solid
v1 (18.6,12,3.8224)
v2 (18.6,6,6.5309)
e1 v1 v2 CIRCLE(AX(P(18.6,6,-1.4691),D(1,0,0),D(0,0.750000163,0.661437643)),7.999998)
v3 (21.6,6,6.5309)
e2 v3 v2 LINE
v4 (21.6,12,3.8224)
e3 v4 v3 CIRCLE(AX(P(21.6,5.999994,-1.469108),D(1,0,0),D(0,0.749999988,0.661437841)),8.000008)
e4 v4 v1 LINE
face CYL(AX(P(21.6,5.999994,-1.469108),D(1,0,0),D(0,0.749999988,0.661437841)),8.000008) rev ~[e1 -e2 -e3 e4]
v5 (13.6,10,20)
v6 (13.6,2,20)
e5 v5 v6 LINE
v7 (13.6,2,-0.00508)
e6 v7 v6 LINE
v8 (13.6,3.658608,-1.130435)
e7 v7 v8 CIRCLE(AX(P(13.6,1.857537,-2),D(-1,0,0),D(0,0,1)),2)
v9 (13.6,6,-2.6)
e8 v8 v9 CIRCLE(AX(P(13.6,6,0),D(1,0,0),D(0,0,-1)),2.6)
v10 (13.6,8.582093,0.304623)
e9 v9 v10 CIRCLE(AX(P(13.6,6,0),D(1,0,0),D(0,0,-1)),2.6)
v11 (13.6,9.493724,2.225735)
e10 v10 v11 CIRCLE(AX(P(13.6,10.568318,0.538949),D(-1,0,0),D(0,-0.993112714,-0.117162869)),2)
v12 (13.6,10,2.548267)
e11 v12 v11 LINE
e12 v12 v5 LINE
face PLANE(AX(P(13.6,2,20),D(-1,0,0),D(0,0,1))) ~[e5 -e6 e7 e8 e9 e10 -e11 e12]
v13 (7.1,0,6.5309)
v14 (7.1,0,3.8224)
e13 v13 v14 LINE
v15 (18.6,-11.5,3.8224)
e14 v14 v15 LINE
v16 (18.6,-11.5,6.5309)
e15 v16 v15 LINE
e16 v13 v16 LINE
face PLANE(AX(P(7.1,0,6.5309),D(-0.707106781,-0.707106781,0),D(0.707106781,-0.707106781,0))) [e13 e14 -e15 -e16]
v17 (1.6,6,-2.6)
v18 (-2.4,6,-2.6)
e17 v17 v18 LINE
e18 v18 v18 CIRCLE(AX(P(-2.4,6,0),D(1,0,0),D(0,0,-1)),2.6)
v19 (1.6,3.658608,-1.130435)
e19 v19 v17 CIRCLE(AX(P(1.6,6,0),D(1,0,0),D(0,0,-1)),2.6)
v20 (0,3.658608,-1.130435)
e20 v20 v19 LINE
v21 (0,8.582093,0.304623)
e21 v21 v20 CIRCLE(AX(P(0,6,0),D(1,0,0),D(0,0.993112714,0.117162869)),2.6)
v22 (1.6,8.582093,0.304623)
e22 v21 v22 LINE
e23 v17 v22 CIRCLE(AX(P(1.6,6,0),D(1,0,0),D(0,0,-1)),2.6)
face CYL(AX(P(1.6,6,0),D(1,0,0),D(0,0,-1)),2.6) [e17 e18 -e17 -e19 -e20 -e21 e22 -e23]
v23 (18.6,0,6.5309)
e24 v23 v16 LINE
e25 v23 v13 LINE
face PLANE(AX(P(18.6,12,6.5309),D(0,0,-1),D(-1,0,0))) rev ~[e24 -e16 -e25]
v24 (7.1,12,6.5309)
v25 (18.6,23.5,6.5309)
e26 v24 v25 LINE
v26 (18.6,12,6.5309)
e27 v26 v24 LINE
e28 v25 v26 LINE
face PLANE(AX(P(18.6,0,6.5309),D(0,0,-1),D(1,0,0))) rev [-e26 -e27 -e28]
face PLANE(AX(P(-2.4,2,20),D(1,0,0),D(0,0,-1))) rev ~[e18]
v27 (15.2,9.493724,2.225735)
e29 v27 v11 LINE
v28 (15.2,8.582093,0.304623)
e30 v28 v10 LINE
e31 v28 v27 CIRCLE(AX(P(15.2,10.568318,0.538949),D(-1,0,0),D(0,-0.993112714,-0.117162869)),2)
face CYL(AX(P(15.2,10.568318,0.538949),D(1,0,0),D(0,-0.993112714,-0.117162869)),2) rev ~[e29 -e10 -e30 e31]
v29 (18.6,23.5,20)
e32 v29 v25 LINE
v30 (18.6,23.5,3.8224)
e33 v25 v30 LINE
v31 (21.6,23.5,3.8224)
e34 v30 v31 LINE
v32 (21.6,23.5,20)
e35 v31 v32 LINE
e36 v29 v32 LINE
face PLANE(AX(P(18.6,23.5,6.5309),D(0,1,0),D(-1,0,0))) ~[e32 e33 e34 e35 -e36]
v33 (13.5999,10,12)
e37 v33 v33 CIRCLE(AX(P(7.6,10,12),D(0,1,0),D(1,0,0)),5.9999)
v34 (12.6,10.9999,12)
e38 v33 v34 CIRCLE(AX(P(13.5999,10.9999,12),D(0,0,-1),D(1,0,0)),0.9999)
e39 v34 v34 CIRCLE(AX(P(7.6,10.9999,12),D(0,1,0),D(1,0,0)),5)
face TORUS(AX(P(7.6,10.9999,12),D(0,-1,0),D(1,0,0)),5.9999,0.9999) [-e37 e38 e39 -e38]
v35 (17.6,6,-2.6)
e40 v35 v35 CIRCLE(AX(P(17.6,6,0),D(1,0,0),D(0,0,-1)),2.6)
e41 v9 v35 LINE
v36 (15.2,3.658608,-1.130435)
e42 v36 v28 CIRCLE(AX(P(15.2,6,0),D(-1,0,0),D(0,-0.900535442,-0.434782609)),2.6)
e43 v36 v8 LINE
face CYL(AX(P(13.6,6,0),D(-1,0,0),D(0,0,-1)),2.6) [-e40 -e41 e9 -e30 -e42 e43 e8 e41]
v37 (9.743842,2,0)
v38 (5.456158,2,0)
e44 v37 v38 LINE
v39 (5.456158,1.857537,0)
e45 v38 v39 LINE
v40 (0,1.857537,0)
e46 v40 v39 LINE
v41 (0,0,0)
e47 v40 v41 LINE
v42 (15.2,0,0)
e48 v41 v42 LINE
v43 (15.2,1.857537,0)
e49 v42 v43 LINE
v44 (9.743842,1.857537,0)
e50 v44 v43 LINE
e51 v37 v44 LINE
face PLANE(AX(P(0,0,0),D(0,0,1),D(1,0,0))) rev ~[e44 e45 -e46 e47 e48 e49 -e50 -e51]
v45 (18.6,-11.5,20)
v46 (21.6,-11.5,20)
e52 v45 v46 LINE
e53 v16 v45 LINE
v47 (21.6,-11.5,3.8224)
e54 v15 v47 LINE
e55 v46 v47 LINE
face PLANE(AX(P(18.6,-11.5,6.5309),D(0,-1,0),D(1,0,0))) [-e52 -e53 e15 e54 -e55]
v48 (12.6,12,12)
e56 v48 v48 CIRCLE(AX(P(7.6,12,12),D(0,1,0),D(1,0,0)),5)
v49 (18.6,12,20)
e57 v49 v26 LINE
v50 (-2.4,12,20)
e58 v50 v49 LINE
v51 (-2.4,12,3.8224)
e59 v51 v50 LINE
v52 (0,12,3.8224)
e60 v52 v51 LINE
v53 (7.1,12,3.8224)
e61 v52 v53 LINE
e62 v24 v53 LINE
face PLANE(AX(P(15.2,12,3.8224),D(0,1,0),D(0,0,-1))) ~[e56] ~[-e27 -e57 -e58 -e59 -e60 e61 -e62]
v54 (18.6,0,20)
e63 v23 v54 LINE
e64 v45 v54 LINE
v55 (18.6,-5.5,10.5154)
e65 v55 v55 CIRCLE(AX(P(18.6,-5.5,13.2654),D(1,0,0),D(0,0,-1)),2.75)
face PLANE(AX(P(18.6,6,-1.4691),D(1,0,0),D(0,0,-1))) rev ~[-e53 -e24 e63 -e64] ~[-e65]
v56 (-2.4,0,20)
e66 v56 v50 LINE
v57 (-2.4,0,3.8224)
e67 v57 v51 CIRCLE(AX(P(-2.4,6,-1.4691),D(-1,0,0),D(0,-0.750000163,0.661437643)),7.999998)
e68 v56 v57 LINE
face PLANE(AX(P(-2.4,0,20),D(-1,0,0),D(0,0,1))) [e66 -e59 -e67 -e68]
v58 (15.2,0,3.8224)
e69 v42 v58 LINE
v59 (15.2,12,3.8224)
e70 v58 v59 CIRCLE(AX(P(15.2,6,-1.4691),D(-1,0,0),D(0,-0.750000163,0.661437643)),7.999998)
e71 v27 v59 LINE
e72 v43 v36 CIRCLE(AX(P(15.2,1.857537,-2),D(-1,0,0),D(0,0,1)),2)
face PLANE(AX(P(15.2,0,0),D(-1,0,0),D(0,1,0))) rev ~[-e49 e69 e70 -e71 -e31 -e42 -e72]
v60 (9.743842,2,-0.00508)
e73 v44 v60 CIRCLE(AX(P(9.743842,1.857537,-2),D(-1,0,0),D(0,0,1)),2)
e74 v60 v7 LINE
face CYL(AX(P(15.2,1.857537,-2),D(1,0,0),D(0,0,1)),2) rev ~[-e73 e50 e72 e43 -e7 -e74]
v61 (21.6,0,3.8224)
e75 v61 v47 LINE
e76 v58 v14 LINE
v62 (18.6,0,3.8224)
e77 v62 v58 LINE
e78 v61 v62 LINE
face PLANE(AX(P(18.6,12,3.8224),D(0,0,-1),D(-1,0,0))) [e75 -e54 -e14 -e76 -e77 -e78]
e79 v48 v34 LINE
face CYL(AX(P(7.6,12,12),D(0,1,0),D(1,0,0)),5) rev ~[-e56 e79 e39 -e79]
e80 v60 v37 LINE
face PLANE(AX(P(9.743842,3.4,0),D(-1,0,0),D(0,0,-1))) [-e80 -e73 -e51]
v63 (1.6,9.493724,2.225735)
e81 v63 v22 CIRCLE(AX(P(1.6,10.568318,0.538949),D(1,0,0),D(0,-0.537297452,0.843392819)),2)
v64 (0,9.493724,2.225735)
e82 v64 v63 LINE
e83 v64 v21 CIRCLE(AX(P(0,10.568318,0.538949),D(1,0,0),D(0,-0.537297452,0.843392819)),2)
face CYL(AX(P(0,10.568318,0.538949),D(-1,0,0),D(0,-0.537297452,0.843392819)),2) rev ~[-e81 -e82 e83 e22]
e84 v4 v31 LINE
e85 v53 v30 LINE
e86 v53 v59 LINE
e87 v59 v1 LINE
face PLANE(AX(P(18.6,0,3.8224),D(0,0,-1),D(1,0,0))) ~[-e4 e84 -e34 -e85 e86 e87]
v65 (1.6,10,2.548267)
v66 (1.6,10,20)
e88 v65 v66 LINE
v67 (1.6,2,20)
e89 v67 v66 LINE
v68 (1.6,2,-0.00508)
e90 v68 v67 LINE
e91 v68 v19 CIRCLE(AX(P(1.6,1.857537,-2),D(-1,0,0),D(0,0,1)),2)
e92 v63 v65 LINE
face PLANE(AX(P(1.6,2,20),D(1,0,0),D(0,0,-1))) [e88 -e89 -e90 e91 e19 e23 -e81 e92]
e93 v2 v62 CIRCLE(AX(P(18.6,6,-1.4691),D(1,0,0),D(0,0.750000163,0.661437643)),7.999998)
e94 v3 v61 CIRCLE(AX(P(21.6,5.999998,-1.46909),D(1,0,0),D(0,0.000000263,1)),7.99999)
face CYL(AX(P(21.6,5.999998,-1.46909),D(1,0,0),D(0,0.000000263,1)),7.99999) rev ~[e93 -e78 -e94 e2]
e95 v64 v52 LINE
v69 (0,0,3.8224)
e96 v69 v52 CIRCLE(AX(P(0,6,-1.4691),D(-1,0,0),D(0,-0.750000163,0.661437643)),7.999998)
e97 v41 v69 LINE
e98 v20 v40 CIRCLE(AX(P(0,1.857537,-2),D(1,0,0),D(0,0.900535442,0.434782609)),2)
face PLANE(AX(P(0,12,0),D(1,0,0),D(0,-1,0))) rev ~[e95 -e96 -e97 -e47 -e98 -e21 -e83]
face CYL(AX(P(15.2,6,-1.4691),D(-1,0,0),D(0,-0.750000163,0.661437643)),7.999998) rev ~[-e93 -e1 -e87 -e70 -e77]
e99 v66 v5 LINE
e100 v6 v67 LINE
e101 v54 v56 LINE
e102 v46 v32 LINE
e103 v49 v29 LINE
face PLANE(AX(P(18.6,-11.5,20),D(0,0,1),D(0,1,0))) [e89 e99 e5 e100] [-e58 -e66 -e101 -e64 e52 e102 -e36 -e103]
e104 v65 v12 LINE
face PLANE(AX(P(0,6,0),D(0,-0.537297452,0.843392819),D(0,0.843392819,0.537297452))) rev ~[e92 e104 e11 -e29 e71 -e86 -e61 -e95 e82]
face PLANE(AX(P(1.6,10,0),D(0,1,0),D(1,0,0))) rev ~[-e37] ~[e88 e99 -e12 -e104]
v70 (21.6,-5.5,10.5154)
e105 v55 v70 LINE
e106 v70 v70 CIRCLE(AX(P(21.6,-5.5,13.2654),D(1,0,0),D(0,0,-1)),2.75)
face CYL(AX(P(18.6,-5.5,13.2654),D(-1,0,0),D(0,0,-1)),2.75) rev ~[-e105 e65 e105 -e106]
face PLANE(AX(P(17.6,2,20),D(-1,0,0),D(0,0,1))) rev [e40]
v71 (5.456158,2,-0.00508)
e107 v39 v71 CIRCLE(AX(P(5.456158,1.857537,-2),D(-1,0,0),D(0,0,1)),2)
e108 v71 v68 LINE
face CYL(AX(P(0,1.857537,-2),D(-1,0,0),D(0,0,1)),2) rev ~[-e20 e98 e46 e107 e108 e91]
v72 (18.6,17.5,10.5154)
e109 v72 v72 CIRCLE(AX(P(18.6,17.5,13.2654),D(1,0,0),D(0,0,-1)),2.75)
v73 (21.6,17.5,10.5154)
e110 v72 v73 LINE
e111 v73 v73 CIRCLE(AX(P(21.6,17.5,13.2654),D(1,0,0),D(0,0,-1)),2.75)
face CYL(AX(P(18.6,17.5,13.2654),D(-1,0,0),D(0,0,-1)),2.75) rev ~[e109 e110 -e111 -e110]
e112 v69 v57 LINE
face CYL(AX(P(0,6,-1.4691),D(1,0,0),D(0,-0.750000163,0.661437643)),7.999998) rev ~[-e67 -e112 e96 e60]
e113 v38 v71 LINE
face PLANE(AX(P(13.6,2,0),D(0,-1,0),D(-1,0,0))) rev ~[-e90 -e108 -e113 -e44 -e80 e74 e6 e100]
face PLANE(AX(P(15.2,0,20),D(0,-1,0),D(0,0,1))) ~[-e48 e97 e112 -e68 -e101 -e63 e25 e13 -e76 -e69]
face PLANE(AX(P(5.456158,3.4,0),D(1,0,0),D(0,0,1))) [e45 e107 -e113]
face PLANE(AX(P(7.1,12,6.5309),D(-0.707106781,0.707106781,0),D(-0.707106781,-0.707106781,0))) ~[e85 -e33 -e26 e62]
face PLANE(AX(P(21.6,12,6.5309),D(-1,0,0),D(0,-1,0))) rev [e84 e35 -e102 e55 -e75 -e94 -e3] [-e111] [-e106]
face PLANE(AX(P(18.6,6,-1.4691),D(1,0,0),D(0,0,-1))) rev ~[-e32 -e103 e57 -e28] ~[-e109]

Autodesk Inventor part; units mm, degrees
ref_plane "YZ Plane" through (0, 0, 0) normal (1, 0, 0) x (0, 1, 0)
sketch "Sketch1" plane through (0, 0, 0) normal (0, 0, 1) x (1, 0, 0)
  line L0 (0, 0) -> (15.2, 0)
  line L1 (15.2, 0) -> (15.2, 12)
  line L2 (15.2, 12) -> (0, 12)
  line L3 (0, 12) -> (0, 0)
  line L4 (1.6, 10) -> (13.6, 10)
  line L5 (13.6, 10) -> (13.6, 2)
  line L6 (13.6, 2) -> (1.6, 2)
  line L7 (1.6, 2) -> (1.6, 10)
  dimension "d0" = 15.2
  dimension "d1" = 12
  dimension "d2" = 1.6
  dimension "d3" = 2
  dimension "d4" = 2
  dimension "d5" = 1.6
extrude "Extrusion1" add sketch "Sketch1" along normal blind 20
sketch "Sketch2" plane through (0, 0, 0) normal (1, 0, 0) x (0, 1, 0)
  line L0 (0, 0) -> (12, 0) construction
  line L1 (6, 13.0663) -> (6, -2.0093) construction
  line L2 (0, 0) -> (0, 20) construction
  line L3 (12, 0) -> (12, 20) construction
  line L4 (6, 0) -> (12, 3.8224)
  line L5 (12, 3.8224) -> (12, 0)
  line L6 (12, 0) -> (6, 0)
  dimension "d8" = 12
  dimension "d9" = 6
  dimension "d10" = 32.5
extrude "Extrusion2" cut sketch "Sketch2" along normal through all
sketch "Sketch4" plane through (1.6, 2, 20) normal (1, 0, 0) x (0, 0, -1)
  circle A0 centre (20, 4) radius 2.6
  point P0 (20, -2)
  dimension "d14" = 5.2
extrude "Extrusion3" add sketch "Sketch4" against normal blind 4
sketch "Sketch5" plane through (0, 0, 20) normal (-1, 0, 0) x (0, 0, 1)
  line L0 (-20, 0) -> (0, 0) construction
  line L1 (0, 12) -> (0, 0) construction
  line L2 (-16.1776, 12) -> (0, 12) construction
  arc A0 (-16.1776, 0) -> (-16.1776, 12) centre (-21.4691, 6) ccw
  line L3 (-16.1776, 12) -> (0, 12)
  line L4 (0, 0) -> (-16.1776, 0)
  line L5 (0, 0) -> (0, 12)
  dimension "d17" = 8
extrude "Extrusion4" add sketch "Sketch5" along normal blind 2.4
ref_plane "Work Plane2" through (7.6, 2, 20) normal (1, 0, 0) x (0, 0, -1)
mirror "Mirror1" about plane through (7.6, 2, 20) normal (1, 0, 0) of "Extrusion3", "Extrusion4"
fillet "Fillet1" radius 2 4 edges at (14.4, 8.1928, 1.397) (0.8, 8.1928, 1.397) (14.4, 3.4, 0) (0.8, 3.4, 0)
sketch "Sketch9" plane through (17.6, 6, -1.4691) normal (1, 0, 0) x (0, 0, -1)
  line L0 (-5.2915, -6) -> (-21.4691, -6) projected
  arc A0 (-5.2915, 6) -> (-5.2915, -6) centre (0, 0) ccw projected
  line L1 (-21.4691, 6) -> (-5.2915, 6) projected
  line L2 (-21.4691, -6) -> (-21.4691, 6) projected
  point P0 (-1.4691, -6)
extrude "Extrusion8" add sketch "Sketch9" along normal blind 1
sketch "Sketch10" plane through (18.6, 6, -1.4691) normal (1, 0, 0) x (0, 0, -1)
  arc A0 (-5.2915, 6) -> (-5.2915, -6) centre (0, 0) ccw construction
  line L0 (-21.4691, 6) -> (-21.4691, -6) construction
  line L1 (-21.4691, 17.5) -> (-8, 17.5)
  line L2 (-8, 17.5) -> (-8, -17.5)
  line L3 (-8, -17.5) -> (-21.4691, -17.5)
  line L4 (-21.4691, -17.5) -> (-21.4691, 17.5)
  line L5 (0, 0) -> (-40.6446, 0) construction
  line L6 (-5.2915, 6) -> (-21.4691, 6) construction
  circle A1 centre (-14.7345, 11.5) radius 2.75
  line L7 (-14.7345, 17.5) -> (-14.7345, -17.5) construction
  circle A2 centre (-14.7345, -11.5) radius 2.75
  dimension "d37" = 35
  dimension "d38" = 17.5
  dimension "d41" = 5.5
  dimension "d42" = 5.5
extrude "Extrusion10" add sketch "Sketch10" along normal blind 3
sketch "Sketch11" plane through (18.6, 12, 6.5309) normal (0, 0, -1) x (-1, 0, 0)
  line L0 (0, -23.5) -> (-3, -23.5) construction
  line L1 (0, -12) -> (0, -23.5) construction
  line L2 (18.6, -12) -> (3.4, -12) construction
  line L3 (-3, -12) -> (11.5, -12)
  line L4 (11.5, -12) -> (0, -23.5)
  line L5 (0, -23.5) -> (-3, -23.5)
  line L6 (-3, -12) -> (-3, -23.5)
  dimension "d47" = 45
extrude "Extrusion11" add sketch "Sketch11" along normal up to surface (2.7085 mm away)
ref_plane "Work Plane4" through (1.6, 6, 20) normal (0, 1, 0) x (1, 0, 0)
mirror "Mirror3" about plane through (1.6, 6, 20) normal (0, 1, 0) of "Extrusion11"
sketch "Sketch13" plane through (21.6, 6, -1.4691) normal (1, 0, 0) x (0, 0, -1)
  line L0 (-8, -6) -> (-5.2915, -6) projected
  line L1 (-8, -6) -> (-8, 6) projected
  line L2 (-8, 6) -> (-5.2915, 6) projected
  arc A0 (-5.2915, 6) -> (-8, 0) centre (0, 0) ccw projected
  arc A1 (-8, 0) -> (-5.2915, -6) centre (0, 0) ccw projected
  point P0 (-1.4691, -6)
extrude "Extrusion13" add sketch "Sketch13" against normal up to surface (3 mm away)
sketch "Sketch14" plane through (-2.4, 12, 3.8224) normal (0, 1, 0) x (1, 0, 0)
  line L0 (4, 1.2741) -> (4, -16.1776) construction
  line L1 (16, 1.2741) -> (16, -16.1776) construction
  line L2 (9.5, 0) -> (2.4, 0) construction
  line L3 (0, -16.1776) -> (21, -16.1776) construction
  circle A0 centre (10, -8.1776) radius 5
  dimension "d54" = 10
  dimension "d56" = 12
  dimension "d57" = 6
  dimension "d58" = 8
extrude "Extrusion14" cut sketch "Sketch14" against normal blind 3
fillet "Fillet2" radius 1 1 edges at (2.6, 10, 12)
equation "\"d9\" = 0.5 * d8"
equation "\"d38\" = 0.5 * d37"
equation "\"d57\" = 0.5 * d56"
properties part number "chain_end_2020"
